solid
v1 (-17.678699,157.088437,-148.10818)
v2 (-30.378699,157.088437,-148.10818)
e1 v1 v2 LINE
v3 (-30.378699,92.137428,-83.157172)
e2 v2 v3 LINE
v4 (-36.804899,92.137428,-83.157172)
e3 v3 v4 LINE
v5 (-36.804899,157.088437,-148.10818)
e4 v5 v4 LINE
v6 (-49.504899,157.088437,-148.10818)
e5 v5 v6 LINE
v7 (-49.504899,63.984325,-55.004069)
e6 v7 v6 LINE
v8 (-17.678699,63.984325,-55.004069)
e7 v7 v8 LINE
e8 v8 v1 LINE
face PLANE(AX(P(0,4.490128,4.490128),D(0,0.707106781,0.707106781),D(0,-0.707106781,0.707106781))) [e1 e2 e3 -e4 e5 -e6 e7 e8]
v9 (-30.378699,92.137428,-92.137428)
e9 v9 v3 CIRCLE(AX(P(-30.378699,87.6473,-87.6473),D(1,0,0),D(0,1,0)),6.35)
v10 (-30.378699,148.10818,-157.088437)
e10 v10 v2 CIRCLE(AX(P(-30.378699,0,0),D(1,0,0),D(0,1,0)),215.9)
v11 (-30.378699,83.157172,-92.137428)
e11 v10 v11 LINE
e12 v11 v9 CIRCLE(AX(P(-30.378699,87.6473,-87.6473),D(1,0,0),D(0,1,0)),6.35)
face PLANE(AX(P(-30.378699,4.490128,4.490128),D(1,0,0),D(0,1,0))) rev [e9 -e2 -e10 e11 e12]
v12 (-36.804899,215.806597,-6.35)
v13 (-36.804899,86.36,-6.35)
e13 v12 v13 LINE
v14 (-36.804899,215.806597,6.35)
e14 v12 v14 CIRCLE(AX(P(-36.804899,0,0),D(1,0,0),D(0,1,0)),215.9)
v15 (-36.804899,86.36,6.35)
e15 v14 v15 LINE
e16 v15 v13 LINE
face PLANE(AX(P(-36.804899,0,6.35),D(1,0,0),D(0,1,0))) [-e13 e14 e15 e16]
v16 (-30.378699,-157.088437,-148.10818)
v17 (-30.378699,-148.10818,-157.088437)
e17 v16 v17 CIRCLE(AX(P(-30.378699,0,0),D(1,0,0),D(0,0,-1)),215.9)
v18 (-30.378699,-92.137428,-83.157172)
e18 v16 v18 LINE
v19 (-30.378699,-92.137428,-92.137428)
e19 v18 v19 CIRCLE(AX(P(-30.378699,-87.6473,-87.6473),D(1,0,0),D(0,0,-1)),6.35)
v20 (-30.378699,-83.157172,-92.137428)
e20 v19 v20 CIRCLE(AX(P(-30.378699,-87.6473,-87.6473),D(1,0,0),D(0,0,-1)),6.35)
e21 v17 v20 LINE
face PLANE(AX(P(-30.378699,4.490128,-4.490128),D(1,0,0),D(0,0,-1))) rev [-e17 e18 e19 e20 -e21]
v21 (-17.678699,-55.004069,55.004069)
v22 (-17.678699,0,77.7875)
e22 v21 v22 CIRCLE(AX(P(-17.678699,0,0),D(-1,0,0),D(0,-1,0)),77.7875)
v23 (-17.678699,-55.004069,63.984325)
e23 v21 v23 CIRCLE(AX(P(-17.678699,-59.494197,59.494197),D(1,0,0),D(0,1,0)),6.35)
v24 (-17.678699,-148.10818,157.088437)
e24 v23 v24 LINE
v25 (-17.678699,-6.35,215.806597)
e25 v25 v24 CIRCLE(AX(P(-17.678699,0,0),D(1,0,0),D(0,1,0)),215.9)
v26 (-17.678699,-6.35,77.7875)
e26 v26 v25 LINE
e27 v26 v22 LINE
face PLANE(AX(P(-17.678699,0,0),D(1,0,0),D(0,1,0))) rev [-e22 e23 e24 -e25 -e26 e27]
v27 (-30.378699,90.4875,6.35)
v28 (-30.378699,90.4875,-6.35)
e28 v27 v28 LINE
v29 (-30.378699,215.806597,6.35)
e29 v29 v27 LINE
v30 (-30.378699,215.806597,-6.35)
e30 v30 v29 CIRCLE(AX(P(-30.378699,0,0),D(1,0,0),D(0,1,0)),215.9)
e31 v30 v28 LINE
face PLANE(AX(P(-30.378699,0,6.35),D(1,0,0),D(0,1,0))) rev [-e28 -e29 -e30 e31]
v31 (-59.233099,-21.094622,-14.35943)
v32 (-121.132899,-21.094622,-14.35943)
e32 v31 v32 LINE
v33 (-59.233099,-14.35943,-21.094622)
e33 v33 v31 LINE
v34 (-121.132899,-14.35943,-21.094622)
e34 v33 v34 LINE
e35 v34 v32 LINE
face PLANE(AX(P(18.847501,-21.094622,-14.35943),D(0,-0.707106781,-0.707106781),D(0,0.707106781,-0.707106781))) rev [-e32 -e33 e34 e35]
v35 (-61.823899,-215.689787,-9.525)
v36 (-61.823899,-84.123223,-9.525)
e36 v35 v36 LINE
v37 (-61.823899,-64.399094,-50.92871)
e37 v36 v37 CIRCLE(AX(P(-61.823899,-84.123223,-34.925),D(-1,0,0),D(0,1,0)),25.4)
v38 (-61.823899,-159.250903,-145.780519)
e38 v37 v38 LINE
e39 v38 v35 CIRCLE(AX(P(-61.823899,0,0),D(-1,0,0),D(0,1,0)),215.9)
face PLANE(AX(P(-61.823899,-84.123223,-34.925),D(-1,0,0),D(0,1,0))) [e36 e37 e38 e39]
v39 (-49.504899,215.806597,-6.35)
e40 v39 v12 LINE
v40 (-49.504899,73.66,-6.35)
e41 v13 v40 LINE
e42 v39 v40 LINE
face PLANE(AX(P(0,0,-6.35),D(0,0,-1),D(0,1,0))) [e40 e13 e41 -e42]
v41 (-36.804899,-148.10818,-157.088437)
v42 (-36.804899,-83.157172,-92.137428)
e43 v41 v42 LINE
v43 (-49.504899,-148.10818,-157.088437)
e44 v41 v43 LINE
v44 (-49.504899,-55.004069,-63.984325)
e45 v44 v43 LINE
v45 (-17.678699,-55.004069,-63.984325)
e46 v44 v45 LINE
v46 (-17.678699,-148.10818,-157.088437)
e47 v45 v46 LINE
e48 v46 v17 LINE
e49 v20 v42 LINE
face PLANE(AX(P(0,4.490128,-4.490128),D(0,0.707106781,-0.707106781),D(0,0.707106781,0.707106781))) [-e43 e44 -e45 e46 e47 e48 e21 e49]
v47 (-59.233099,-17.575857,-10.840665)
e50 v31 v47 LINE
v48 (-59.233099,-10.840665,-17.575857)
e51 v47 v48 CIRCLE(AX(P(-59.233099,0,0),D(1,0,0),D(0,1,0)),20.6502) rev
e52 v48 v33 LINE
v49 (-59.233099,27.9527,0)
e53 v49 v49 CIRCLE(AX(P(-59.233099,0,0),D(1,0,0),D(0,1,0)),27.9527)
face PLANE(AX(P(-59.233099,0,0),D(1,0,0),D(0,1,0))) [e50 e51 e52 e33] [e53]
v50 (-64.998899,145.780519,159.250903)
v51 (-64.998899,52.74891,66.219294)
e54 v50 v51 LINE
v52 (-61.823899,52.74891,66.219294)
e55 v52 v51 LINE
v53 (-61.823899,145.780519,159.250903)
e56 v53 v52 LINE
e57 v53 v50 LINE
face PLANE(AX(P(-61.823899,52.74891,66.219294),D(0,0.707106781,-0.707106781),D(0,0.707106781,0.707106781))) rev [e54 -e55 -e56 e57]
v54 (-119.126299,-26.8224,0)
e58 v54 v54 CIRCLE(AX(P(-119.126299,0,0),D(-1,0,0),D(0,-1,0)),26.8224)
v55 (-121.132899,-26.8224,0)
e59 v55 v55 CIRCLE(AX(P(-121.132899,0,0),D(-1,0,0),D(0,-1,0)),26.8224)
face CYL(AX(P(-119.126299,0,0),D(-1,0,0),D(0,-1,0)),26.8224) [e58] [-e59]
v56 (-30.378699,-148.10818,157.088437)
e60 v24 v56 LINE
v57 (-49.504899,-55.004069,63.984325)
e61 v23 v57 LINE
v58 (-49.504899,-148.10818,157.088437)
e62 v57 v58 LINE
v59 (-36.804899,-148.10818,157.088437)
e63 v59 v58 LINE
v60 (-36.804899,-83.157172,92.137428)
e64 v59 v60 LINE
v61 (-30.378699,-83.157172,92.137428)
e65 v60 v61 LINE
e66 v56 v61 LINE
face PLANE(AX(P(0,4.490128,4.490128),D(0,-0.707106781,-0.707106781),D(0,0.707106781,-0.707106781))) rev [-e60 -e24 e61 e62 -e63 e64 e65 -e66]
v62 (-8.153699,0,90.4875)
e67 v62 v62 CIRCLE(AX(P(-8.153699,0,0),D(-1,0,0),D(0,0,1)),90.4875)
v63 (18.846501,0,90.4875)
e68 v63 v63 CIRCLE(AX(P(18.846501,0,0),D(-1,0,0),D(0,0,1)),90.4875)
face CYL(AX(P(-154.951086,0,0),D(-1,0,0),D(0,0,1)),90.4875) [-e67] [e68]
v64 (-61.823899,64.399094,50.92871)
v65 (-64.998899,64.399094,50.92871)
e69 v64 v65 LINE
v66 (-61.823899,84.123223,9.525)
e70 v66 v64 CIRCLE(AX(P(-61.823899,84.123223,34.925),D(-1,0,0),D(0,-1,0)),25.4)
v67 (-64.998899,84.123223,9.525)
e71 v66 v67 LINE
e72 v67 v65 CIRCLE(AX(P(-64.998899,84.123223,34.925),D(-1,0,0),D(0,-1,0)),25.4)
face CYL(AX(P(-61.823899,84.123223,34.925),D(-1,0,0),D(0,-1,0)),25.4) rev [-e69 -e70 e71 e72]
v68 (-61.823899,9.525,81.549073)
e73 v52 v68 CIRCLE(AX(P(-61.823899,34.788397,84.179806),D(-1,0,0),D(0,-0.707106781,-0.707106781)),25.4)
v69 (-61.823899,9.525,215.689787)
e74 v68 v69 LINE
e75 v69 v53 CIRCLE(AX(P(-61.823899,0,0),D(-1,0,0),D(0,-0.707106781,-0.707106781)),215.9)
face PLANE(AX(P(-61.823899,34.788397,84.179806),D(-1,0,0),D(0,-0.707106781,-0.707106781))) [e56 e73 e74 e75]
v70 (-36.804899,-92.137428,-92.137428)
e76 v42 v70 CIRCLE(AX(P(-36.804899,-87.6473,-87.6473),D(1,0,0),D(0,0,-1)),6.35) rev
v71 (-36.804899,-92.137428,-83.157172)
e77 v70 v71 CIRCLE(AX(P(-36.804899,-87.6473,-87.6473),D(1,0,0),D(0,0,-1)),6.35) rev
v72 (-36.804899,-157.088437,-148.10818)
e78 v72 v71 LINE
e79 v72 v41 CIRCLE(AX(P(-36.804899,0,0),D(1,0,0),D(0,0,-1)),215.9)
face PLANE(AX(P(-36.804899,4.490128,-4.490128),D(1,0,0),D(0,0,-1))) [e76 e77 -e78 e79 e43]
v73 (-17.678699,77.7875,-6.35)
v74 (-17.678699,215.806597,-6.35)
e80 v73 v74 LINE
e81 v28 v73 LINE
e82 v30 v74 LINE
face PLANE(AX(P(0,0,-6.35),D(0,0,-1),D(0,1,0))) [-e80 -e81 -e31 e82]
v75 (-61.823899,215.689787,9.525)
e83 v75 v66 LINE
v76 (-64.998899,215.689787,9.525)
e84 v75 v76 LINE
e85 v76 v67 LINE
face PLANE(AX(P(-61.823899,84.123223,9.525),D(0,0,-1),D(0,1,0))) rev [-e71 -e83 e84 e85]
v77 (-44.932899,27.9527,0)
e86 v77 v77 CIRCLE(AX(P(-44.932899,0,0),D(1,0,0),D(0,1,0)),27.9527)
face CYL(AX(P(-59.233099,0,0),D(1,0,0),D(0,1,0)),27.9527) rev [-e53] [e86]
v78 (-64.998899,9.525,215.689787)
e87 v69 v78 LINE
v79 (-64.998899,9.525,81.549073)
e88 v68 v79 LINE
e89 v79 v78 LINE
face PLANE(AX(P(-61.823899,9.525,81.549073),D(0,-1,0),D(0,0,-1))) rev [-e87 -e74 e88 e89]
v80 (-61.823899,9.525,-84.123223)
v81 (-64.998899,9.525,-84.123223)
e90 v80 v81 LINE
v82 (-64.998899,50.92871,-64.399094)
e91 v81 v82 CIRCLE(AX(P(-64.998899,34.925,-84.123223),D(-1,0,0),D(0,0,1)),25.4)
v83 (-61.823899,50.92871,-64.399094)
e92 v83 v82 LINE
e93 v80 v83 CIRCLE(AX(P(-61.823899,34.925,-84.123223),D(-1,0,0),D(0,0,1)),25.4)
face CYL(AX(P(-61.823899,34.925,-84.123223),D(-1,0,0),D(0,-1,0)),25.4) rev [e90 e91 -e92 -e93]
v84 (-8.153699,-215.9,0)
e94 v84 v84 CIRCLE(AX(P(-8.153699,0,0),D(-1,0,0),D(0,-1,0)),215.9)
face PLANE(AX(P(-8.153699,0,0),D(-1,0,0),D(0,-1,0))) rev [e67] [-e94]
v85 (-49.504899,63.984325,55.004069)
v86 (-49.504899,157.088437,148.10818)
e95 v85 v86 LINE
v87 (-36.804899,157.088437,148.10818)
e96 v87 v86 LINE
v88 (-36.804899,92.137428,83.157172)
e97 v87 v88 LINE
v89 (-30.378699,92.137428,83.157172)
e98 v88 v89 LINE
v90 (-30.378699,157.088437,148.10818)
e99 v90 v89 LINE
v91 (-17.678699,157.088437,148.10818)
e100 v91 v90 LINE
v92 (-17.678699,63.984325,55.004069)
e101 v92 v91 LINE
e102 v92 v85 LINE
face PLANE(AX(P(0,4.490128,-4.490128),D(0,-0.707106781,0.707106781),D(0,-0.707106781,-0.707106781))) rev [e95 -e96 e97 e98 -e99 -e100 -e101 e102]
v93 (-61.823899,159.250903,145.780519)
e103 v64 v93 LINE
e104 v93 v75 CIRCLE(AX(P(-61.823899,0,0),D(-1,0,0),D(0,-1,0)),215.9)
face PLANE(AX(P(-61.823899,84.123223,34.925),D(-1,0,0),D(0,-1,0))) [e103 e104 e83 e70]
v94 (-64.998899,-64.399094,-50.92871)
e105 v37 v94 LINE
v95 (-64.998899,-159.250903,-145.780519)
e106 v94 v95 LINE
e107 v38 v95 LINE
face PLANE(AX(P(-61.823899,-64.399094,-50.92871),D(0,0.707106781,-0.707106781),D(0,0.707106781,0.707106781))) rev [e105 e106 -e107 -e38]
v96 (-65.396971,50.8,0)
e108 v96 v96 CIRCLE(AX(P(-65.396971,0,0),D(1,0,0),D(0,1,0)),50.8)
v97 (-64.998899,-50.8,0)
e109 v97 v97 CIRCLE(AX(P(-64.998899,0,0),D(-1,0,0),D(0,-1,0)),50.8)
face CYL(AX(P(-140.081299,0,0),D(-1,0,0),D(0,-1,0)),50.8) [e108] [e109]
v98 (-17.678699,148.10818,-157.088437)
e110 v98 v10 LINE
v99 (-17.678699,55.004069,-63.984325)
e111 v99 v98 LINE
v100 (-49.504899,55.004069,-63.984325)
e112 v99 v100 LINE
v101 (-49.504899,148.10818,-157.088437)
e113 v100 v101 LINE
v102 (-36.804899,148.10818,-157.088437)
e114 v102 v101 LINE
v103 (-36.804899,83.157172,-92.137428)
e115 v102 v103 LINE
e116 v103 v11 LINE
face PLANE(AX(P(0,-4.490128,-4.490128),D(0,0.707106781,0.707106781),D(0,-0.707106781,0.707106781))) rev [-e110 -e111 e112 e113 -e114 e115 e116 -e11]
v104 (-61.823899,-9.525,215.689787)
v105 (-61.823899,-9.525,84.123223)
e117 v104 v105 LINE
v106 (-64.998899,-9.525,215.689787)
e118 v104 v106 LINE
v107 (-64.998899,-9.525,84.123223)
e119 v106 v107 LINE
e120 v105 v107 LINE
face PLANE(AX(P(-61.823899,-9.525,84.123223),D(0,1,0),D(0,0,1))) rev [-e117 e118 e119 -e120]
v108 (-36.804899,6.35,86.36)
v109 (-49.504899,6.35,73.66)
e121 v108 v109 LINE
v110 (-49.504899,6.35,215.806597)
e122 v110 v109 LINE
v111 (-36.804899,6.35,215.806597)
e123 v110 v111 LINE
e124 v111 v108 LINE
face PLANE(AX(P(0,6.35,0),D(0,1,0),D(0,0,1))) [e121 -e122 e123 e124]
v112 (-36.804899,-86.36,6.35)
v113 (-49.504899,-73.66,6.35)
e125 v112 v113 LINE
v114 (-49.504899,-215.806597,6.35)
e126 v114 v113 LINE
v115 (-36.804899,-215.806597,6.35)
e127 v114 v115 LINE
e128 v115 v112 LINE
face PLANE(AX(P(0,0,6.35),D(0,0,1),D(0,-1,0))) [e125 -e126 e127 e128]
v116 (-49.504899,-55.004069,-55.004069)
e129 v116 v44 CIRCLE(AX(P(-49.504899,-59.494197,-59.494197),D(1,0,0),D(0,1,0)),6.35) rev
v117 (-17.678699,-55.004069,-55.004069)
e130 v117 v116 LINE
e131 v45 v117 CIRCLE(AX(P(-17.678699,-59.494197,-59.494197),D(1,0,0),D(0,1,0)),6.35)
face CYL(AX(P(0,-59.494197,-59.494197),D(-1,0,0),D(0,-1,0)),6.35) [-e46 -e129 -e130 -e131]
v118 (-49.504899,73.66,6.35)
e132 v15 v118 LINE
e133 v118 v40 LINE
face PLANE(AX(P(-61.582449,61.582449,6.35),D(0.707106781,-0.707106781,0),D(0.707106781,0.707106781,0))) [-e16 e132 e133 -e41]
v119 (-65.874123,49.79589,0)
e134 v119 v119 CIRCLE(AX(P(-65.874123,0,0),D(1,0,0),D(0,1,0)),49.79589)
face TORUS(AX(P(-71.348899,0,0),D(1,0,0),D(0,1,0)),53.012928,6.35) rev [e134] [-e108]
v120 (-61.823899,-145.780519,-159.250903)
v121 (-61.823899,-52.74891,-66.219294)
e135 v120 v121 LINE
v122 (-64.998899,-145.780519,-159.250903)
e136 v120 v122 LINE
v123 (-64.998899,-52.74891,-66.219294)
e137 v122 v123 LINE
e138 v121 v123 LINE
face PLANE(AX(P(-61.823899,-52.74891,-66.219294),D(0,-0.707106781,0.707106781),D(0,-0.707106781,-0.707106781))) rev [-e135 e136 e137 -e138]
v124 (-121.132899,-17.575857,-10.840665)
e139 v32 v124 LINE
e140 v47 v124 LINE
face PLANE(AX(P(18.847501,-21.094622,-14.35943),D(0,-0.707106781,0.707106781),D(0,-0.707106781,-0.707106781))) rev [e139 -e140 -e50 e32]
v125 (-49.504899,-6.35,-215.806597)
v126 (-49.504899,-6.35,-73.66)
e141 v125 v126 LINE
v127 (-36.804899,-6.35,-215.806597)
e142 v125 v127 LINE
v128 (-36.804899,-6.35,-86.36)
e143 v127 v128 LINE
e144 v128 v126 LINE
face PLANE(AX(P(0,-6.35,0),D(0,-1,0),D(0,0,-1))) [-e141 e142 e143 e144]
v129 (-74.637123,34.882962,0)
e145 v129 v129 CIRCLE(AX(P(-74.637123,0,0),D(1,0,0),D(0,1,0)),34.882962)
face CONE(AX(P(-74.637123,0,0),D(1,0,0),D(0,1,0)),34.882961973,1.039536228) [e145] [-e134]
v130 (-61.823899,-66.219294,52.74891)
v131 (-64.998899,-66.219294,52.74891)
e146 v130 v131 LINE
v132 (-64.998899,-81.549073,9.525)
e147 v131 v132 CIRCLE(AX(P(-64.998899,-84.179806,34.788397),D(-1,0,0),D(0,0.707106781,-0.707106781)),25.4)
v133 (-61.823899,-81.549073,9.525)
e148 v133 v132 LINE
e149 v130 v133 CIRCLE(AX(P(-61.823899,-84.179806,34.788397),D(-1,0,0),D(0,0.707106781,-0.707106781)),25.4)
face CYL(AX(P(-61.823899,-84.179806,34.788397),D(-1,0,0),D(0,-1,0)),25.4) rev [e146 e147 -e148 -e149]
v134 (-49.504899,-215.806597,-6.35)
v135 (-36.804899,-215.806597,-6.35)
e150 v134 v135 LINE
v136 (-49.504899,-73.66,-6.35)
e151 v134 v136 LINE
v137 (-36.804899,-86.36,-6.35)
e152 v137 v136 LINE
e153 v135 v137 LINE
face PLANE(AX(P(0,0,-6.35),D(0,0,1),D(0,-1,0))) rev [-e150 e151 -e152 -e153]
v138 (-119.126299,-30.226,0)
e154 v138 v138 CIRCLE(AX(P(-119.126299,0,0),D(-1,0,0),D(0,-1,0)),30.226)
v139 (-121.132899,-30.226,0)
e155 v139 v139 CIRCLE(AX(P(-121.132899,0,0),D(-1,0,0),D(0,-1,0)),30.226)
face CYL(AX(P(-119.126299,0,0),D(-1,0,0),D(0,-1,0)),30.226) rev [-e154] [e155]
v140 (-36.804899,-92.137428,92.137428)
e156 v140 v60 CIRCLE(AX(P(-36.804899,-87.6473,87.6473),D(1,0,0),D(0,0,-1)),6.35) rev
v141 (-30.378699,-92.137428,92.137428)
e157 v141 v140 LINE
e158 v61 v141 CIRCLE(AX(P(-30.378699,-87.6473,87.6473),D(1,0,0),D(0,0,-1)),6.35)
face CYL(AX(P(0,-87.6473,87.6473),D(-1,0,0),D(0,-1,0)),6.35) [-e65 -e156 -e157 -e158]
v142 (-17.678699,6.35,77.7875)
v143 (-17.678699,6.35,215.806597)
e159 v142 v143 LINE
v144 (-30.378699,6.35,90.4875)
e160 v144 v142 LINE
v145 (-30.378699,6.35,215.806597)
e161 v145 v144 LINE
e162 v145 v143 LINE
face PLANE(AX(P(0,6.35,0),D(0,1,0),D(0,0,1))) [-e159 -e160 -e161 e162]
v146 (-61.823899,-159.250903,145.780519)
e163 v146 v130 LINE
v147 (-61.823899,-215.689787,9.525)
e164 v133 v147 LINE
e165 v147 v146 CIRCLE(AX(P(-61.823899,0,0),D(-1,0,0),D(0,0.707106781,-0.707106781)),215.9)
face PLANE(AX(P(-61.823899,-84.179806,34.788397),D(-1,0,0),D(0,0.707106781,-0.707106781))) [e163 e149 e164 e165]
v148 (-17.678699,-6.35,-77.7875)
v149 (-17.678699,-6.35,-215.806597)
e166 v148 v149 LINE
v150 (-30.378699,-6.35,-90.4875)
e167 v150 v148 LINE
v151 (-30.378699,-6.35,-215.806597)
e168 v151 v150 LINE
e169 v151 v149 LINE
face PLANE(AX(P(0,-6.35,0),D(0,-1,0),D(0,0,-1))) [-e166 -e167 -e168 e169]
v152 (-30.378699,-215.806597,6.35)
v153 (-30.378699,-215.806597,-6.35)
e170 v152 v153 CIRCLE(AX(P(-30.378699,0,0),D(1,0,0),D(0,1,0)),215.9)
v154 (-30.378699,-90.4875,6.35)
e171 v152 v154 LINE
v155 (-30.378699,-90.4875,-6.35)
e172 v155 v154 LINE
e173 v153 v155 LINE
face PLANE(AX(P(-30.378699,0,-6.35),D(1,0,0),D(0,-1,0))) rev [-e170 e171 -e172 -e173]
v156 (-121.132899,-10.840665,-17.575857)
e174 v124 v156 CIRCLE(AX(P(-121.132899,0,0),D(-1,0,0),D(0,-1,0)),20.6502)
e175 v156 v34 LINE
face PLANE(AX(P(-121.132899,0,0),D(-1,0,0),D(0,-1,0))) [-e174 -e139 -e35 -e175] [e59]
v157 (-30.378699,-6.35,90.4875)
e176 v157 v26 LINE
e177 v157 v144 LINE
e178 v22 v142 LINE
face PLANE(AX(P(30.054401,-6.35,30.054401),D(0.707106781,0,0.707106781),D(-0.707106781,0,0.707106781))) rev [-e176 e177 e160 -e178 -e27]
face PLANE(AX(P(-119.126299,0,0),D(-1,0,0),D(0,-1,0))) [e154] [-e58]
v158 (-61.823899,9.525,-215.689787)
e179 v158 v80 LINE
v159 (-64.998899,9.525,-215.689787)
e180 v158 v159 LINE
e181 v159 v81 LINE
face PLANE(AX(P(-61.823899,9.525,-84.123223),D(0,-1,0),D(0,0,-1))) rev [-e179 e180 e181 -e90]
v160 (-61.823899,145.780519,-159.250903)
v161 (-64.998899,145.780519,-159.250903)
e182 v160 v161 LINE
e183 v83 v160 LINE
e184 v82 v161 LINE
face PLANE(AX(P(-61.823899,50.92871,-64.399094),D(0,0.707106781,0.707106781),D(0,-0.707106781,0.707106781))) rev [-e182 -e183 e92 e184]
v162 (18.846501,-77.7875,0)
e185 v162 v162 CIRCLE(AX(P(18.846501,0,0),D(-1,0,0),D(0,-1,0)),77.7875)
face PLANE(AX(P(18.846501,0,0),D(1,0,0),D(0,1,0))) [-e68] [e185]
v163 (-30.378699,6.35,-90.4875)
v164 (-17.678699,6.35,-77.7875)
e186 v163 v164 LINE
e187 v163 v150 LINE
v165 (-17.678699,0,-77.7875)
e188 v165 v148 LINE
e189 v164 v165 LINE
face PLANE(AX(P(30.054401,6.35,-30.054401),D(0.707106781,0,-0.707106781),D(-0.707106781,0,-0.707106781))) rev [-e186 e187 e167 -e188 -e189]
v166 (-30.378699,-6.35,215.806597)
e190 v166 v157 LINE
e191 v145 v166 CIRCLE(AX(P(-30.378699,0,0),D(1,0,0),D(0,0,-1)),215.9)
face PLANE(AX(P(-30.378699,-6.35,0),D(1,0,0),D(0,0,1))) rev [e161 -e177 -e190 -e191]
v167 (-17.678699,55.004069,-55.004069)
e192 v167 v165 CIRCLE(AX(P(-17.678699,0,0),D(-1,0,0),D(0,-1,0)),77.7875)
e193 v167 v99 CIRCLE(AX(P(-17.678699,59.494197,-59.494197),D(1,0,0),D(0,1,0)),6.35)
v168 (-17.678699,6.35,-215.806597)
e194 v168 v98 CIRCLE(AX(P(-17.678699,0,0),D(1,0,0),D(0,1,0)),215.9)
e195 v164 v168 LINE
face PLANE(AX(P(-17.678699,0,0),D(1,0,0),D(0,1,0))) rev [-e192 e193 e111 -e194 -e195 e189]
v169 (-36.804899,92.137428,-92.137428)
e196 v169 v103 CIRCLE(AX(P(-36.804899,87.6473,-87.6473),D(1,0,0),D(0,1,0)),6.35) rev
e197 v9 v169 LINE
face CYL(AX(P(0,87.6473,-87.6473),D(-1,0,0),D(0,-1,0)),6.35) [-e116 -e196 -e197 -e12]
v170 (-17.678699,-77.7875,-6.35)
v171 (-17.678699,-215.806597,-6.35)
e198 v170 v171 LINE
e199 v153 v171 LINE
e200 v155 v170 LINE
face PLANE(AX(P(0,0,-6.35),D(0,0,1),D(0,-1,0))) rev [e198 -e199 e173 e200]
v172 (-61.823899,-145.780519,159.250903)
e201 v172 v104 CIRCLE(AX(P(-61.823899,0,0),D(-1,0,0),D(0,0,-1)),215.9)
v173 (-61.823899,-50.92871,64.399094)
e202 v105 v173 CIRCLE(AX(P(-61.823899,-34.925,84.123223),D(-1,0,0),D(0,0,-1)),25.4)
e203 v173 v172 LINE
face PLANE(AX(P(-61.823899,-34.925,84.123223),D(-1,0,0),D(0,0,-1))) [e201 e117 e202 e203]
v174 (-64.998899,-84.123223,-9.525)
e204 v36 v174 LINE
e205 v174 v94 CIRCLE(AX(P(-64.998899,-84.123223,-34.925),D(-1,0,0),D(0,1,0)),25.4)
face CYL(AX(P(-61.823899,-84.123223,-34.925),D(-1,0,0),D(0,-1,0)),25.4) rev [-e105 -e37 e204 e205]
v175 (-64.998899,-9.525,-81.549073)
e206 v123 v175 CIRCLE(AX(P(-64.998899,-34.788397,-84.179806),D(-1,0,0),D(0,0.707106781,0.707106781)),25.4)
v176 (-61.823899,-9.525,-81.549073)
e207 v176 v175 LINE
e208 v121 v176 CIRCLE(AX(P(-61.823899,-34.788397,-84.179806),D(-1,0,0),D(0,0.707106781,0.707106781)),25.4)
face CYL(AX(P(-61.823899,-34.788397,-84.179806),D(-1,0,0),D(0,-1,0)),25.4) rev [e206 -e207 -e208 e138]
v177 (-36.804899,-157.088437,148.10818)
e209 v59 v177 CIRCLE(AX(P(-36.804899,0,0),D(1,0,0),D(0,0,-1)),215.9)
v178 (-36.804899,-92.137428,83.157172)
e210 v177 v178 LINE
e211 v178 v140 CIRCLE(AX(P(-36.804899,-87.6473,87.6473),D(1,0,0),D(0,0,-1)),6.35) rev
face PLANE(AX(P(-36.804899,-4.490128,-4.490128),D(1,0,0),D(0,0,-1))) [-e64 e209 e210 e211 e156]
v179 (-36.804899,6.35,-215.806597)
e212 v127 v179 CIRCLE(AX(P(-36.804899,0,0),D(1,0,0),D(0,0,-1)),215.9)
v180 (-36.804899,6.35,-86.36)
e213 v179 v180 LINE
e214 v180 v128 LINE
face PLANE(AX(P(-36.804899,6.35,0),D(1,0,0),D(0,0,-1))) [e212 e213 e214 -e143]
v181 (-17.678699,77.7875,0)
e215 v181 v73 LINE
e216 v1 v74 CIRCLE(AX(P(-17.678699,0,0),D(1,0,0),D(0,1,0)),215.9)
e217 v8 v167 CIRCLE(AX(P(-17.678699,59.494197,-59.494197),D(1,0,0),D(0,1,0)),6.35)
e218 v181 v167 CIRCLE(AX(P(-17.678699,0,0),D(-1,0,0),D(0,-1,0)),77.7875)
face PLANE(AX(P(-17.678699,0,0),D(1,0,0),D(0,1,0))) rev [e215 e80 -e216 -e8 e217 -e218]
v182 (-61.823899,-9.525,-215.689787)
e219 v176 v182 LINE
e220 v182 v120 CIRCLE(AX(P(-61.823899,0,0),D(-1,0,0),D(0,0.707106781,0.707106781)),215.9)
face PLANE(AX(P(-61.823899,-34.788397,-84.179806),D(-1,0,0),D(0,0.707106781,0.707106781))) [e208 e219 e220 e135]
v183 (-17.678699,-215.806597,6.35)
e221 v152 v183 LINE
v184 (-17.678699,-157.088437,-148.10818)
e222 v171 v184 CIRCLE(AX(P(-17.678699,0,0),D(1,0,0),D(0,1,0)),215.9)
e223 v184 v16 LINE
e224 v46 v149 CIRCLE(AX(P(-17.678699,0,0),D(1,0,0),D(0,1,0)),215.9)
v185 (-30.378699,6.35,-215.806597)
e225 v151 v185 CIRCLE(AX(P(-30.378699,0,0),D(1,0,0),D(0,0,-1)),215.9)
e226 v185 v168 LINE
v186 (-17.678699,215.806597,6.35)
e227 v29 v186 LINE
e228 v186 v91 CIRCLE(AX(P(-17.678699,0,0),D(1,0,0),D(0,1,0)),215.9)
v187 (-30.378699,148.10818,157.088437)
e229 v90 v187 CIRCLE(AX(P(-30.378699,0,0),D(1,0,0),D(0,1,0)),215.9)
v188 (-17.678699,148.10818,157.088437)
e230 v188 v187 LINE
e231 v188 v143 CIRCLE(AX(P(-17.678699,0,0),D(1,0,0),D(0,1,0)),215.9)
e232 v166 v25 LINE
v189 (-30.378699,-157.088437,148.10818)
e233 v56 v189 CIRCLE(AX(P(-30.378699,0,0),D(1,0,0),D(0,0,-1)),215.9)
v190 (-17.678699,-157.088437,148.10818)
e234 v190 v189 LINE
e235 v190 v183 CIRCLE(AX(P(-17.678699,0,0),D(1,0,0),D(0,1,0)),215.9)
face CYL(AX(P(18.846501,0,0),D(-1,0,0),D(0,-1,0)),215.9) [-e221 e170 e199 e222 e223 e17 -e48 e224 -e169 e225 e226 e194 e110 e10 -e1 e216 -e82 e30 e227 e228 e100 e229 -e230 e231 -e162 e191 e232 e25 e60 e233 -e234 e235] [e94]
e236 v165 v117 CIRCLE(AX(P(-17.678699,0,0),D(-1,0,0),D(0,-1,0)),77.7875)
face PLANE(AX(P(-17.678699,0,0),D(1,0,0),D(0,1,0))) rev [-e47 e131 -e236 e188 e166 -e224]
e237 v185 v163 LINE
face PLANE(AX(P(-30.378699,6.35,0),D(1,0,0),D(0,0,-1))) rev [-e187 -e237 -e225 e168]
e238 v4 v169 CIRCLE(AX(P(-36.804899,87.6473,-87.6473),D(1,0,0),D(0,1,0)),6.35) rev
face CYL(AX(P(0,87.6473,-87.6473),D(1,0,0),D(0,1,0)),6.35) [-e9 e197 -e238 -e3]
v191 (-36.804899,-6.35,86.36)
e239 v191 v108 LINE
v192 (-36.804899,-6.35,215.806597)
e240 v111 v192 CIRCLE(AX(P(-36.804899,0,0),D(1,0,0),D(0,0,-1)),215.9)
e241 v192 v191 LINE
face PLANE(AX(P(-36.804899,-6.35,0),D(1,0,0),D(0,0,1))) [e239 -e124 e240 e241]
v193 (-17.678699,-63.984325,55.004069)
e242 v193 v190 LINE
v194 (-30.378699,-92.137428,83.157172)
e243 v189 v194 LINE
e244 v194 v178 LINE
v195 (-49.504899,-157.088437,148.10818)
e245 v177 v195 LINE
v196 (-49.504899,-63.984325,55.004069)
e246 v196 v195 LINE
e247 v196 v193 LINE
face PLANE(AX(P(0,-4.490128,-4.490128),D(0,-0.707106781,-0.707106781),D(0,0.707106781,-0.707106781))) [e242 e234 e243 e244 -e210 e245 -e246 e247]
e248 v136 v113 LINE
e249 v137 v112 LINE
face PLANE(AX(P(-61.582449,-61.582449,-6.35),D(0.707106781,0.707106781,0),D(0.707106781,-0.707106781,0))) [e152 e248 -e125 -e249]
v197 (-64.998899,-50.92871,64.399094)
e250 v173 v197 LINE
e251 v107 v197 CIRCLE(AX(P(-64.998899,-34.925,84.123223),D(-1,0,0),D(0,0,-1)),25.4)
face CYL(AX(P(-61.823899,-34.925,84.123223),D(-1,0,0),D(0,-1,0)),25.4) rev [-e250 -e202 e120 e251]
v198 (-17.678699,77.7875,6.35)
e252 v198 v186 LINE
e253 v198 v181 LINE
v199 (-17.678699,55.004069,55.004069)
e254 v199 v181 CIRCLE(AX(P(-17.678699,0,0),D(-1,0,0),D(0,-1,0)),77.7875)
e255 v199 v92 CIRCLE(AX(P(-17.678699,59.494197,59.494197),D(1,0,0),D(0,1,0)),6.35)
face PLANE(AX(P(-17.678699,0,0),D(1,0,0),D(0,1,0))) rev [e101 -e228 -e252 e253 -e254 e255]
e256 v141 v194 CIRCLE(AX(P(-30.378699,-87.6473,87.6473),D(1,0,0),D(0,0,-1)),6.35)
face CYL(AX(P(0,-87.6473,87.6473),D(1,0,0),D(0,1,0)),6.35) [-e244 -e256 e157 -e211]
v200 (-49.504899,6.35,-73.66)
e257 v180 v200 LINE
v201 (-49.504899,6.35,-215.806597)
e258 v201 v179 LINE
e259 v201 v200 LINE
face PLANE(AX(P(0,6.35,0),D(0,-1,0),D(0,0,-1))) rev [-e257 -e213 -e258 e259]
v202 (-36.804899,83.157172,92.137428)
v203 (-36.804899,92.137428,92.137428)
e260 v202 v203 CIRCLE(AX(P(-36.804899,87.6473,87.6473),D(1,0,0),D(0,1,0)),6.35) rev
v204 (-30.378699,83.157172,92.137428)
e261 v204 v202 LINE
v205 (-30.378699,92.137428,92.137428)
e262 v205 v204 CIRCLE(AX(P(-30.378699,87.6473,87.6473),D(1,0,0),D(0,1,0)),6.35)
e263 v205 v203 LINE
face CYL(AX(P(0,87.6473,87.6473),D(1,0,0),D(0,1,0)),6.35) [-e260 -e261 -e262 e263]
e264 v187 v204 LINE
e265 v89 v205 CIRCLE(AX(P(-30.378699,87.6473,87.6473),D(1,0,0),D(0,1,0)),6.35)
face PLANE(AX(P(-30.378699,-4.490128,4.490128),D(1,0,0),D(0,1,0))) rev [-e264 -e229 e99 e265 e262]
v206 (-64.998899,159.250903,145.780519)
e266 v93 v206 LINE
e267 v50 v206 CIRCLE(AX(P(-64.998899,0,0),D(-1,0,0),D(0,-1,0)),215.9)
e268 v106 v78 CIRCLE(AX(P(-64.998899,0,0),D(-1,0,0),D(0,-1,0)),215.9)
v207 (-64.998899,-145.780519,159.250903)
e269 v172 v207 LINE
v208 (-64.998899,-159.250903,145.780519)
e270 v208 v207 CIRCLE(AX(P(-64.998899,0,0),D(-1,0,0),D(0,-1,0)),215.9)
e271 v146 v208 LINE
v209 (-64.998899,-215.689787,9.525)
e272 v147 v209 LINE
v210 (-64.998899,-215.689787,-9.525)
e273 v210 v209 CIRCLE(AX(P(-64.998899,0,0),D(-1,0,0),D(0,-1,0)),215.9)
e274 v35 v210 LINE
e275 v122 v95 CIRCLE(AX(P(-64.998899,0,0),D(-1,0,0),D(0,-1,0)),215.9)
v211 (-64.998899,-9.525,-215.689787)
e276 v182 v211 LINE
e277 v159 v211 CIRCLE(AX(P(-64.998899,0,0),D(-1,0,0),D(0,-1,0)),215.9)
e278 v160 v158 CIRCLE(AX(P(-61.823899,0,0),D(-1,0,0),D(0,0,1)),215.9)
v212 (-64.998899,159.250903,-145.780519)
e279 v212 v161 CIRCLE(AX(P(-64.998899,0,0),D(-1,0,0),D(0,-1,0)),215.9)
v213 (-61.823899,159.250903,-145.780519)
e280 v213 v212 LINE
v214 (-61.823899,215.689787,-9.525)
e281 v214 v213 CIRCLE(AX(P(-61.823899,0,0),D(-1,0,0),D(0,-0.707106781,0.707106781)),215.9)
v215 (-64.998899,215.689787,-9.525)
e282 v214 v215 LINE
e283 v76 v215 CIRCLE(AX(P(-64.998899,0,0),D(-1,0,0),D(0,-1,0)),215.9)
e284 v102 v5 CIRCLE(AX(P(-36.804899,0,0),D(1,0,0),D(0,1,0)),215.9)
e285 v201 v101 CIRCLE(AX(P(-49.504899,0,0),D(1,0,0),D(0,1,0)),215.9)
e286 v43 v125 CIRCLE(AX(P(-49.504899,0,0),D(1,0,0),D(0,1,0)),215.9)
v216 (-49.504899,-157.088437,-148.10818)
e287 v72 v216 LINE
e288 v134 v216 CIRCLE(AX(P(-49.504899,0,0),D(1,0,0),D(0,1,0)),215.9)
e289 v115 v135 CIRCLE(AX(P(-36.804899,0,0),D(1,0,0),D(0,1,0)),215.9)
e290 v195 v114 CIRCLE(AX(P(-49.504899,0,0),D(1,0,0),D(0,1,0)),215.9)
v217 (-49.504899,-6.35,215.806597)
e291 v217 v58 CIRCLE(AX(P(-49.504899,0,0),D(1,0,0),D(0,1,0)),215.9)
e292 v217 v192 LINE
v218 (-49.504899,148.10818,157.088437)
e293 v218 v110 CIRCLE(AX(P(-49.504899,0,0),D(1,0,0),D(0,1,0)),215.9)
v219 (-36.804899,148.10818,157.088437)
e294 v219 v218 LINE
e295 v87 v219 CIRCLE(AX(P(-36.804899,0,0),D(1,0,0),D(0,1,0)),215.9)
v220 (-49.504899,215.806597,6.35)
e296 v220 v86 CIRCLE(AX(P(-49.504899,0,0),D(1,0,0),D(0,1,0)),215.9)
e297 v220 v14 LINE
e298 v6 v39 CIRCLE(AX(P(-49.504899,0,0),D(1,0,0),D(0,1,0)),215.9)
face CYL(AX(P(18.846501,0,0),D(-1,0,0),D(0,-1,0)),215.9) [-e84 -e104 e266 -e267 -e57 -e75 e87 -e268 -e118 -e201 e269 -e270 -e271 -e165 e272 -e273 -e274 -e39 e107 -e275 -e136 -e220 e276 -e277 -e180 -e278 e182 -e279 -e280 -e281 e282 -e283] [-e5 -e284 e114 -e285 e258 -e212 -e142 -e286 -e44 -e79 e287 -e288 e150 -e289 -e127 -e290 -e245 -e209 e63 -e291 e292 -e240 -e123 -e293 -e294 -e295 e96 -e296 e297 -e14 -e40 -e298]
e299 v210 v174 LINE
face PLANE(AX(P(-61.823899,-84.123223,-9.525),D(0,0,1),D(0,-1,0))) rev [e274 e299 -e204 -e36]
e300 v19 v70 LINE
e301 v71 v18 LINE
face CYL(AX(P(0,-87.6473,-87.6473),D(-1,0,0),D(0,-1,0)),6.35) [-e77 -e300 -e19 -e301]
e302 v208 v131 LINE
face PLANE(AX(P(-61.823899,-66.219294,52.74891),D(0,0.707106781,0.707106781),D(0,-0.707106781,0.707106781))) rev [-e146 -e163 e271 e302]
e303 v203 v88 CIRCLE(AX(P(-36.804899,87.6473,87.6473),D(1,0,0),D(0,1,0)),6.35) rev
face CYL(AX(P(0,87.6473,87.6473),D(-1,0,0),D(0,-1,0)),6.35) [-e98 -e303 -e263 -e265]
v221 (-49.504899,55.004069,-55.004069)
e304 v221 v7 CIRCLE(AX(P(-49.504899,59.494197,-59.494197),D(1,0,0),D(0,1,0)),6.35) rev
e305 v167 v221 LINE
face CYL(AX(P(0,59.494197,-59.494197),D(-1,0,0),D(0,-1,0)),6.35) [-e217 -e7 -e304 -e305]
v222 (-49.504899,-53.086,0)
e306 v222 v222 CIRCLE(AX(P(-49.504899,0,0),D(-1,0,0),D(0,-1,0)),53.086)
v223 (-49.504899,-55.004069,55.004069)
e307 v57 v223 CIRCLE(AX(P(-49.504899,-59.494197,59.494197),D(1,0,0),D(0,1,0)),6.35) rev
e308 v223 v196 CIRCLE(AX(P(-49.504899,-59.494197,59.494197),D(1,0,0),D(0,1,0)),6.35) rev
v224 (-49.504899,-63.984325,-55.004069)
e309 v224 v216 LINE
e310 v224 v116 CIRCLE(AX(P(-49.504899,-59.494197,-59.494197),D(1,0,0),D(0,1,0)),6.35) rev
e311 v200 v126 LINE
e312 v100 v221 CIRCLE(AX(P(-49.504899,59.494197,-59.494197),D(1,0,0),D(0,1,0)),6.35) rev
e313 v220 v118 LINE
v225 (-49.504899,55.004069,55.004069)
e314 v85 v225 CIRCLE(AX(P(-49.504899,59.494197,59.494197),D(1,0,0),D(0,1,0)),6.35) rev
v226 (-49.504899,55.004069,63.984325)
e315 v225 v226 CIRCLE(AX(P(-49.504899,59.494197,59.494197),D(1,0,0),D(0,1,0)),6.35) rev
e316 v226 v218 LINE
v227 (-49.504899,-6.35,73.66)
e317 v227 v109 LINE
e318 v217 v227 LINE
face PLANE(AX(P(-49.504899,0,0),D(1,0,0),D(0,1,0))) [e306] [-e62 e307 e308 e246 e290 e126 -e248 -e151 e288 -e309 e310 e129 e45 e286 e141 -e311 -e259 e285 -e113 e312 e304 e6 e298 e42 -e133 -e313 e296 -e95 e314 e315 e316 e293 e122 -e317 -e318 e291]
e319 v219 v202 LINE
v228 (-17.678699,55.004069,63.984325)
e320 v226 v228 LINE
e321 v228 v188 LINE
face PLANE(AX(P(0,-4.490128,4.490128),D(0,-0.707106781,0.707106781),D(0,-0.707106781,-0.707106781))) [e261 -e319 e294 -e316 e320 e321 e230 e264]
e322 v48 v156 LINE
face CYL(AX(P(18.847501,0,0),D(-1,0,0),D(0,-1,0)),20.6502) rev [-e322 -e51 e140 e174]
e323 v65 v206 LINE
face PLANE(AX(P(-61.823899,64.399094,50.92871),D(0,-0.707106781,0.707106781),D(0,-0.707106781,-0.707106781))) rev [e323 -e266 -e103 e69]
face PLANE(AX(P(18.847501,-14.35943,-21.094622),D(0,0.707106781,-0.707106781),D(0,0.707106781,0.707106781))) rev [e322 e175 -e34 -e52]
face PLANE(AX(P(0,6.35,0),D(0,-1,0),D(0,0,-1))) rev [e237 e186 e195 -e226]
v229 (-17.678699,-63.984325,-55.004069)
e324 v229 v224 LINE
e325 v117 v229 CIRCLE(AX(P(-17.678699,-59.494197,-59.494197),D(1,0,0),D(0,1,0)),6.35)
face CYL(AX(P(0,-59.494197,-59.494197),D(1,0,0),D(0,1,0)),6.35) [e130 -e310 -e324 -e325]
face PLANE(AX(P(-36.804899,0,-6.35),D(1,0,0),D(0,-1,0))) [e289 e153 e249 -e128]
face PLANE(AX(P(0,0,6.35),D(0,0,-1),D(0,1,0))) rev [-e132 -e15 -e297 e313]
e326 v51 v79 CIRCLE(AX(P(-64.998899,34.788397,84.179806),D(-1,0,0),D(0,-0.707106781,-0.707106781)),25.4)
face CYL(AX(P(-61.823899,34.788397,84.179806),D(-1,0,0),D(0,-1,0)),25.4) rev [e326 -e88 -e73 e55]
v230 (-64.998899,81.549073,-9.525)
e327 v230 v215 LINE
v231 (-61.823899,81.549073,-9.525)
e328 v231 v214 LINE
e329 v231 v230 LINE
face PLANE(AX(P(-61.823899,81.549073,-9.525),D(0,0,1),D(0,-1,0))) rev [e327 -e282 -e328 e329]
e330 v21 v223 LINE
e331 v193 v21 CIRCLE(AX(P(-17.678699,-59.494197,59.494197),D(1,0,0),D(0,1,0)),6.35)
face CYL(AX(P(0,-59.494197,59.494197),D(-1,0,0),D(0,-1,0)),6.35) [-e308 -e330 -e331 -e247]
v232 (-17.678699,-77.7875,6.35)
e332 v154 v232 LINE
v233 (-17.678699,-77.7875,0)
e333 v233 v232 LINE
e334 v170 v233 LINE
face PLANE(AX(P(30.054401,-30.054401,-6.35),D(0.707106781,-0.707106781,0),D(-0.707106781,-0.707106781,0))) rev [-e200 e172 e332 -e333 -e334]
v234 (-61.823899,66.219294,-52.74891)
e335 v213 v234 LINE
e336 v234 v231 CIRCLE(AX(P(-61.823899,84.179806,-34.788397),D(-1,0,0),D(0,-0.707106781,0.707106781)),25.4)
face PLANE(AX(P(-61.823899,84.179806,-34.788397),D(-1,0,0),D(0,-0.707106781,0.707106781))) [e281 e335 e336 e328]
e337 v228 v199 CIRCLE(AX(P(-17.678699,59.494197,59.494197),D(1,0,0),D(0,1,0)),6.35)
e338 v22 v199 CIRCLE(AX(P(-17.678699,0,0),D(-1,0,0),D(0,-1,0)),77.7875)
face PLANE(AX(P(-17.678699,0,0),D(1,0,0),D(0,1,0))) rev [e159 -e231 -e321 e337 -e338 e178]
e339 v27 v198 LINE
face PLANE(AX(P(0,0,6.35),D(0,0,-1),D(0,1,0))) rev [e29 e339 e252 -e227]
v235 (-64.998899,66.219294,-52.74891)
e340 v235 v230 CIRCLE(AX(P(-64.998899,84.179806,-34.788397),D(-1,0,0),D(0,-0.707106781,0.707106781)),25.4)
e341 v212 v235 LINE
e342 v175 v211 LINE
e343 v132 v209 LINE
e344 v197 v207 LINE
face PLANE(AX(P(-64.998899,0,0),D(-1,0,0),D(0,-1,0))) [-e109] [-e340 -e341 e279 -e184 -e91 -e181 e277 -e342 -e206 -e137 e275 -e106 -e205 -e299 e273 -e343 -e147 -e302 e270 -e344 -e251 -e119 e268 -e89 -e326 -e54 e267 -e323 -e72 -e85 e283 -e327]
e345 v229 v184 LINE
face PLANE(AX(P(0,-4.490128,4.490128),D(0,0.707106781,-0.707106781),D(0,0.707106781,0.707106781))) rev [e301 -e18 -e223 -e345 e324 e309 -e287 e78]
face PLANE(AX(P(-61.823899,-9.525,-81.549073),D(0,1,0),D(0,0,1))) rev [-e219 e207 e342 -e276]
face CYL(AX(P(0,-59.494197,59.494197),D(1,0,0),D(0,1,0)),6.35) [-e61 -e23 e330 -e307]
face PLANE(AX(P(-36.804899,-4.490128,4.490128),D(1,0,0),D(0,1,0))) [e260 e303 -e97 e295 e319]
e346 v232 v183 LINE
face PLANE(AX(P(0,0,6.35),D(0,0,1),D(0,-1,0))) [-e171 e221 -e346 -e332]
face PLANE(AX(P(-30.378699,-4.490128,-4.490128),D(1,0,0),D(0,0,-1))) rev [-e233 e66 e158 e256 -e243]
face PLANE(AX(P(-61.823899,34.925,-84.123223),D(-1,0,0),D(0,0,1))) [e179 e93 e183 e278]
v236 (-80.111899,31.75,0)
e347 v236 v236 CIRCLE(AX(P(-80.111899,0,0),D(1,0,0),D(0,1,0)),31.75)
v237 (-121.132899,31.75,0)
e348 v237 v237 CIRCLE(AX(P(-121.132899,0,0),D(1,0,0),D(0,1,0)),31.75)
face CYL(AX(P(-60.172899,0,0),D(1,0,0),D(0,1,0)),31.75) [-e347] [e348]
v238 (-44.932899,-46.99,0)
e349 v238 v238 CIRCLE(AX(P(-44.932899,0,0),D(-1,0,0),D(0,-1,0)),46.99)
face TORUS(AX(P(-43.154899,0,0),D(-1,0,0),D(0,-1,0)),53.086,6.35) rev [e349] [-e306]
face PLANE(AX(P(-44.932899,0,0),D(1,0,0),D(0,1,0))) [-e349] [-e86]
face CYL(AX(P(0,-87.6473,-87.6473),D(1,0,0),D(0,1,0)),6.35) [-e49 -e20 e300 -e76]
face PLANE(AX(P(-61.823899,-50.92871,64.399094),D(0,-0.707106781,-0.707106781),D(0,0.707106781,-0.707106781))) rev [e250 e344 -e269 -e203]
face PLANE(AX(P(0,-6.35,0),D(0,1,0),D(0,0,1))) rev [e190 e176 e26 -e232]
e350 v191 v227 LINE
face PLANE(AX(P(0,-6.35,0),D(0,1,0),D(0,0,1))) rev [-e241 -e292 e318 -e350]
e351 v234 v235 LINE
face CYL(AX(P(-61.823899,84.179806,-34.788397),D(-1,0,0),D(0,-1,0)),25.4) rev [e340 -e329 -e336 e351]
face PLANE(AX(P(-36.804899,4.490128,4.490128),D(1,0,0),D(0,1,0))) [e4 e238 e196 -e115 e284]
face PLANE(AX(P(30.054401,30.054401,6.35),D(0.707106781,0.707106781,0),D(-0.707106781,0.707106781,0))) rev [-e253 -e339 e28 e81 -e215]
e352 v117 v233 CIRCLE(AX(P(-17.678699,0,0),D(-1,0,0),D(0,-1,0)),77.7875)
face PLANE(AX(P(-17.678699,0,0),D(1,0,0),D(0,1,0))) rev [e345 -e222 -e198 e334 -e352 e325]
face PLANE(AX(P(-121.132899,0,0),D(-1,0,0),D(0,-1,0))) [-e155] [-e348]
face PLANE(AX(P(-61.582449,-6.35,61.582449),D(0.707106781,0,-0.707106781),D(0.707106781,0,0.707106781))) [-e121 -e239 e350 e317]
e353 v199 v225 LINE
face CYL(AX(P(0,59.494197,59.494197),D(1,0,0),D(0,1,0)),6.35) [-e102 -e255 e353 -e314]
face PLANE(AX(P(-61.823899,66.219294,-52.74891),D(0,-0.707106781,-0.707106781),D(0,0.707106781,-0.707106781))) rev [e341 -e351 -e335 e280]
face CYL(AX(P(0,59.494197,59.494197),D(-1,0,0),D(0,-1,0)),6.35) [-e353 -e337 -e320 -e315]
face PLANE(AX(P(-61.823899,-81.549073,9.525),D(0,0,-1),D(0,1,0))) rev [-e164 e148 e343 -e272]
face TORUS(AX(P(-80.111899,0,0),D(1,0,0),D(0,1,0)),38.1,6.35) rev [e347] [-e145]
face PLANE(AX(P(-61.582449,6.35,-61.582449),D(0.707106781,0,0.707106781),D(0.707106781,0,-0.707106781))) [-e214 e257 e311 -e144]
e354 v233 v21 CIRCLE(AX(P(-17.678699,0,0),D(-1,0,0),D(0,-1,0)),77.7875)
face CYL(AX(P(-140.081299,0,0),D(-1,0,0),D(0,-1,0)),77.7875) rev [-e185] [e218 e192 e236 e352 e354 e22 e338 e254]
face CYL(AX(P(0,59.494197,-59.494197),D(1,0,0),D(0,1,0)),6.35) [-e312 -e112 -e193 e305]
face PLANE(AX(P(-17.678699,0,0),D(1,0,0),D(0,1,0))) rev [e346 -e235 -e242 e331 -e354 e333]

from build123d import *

# Parameters (mm, degrees)
BOSS_EXTRUDE3_DEPTH      = 6.35
FILLET1_R                = 6.35
CIRPATTERN5_COUNT        = 4
FILLET1_OF_CIRPATTERN5_R = 6.35
BOSS_EXTRUDE4_DEPTH      = 6.35
CIRPATTERN4_COUNT        = 4
SKETCH6_R                = 234.193665804
SKETCH6_R_2              = 215.9
CUT_EXTRUDE1_DEPTH       = 350.00288517
FILLET2_R                = 0.635
SKETCH7_R                = 60.93897947
CUT_EXTRUDE2_DEPTH       = 4.953
SKETCH8_R                = 79.670197019
CUT_EXTRUDE3_DEPTH       = 18.9484
CUT_EXTRUDE4_START       = 20.32
SKETCH11_R               = 219.71
SKETCH11_R_2             = 50.8
CUT_EXTRUDE4_DEPTH       = 20.32
CUT_EXTRUDE10_REACH      = 337.887
SKETCH20_R               = 30.226
SKETCH20_R_2             = 26.8224
CUT_EXTRUDE11_DEPTH      = 2.0066
CUT_EXTRUDE13_DEPTH      = 3.175
CIRPATTERN6_COUNT        = 8
SKETCH24_W               = 27.0002
SKETCH24_H               = 10.092146942
SKETCH25_R               = 27.9527
CUT_EXTRUDE14_DEPTH      = 14.3002


with BuildPart() as part:
    # Sketch1 → Revolve2 (revolve)
    with BuildSketch(Plane.XY, mode=Mode.PRIVATE) as revolve2_sk:
        with BuildLine():
            Line((-140.081298787, 50.8), (-140.081298787, 0))
            Line((-140.081298787, 0), (-39.979898787, 0))
            Line((-39.979898787, 0), (-39.979898787, 46.736))
            Line((-39.979898787, 46.736), (-43.154898787, 46.736))
            ThreePointArc((-43.154898787, 46.736), (-47.645026847, 48.595871939), (-49.504898787, 53.086))
            Line((-49.504898787, 53.086), (-49.504898787, 219.71))
            Line((-49.504898787, 219.71), (-64.998898787, 219.71))
            Line((-64.998898787, 219.71), (-64.998898787, 63.5))
            ThreePointArc((-64.998898787, 63.5), (-68.718642666, 54.519743879), (-77.698898787, 50.8))
            Line((-77.698898787, 50.8), (-140.081298787, 50.8))
        make_face()
        with BuildLine():
            Line((-9.677698787, 219.71), (-17.678698787, 219.71))
            Line((-17.678698787, 219.71), (-17.678698787, 77.7875))
            Line((-17.678698787, 77.7875), (1.650701213, 77.7875))
            Line((1.650701213, 77.7875), (18.846501213, 77.7875))
            Line((18.846501213, 77.7875), (18.846501213, 93.599))
            ThreePointArc((18.846501213, 93.599), (18.400131948, 94.676630735), (17.322501213, 95.123))
            Line((17.322501213, 95.123), (-6.629698787, 95.123))
            ThreePointArc((-6.629698787, 95.123), (-7.707329521, 95.569369265), (-8.153698787, 96.647))
            Line((-8.153698787, 96.647), (-8.153698787, 218.186))
            ThreePointArc((-8.153698787, 218.186), (-8.600068052, 219.263630735), (-9.677698787, 219.71))
        make_face()
    revolve(revolve2_sk.sketch.rotate(Axis((-140.081298787, 0, 0), (1, 0, 0)), 180), axis=Axis((-140.081298787, 0, 0), (1, 0, 0)))

    # Sketch4 → Boss-Extrude3 (add, symmetric)
    with BuildSketch(Plane(origin=(0, 0, 0), x_dir=(1, 0, 0), z_dir=(0, -0.7071067811865488, 0.7071067811865464))):
        Polygon((-17.678698787, 219.71), (-30.378698787, 219.71), (-30.378698787, 130.302), (-36.804898787, 130.302), (-36.804898787, 219.71), (-49.504898787, 219.71), (-49.504898787, 77.7875), (-17.678698787, 77.7875), align=None)
    boss_extrude3 = extrude(amount=BOSS_EXTRUDE3_DEPTH, both=True)

    # Fillet1
    # the kernel refuses this fillet: 6.35 mm, written as the material it takes off along each edge
    with BuildSketch(Plane(origin=(-30.378698787, 87.647299742, 96.627555863), x_dir=(0, -0.7071067811865464, -0.7071067811865486), z_dir=(-1, 0, 0))) as fillet1_piece_1:
        with BuildLine():
            CenterArc((FILLET1_R, -FILLET1_R), FILLET1_R, 90, 90)
            Line((0, -FILLET1_R), (0, 0))
            Line((0, 0), (FILLET1_R, 0))
        make_face()
    extrude(amount=6.4262, mode=Mode.SUBTRACT)
    with BuildSketch(Plane(origin=(-30.378698787, 96.627555863, 87.647299742), x_dir=(0, -0.7071067811865464, -0.7071067811865486), z_dir=(-1, 0, 0))) as fillet1_piece_2:
        with BuildLine():
            CenterArc((FILLET1_R, FILLET1_R), FILLET1_R, 180, 90)
            Line((0, FILLET1_R), (0, 0))
            Line((0, 0), (FILLET1_R, 0))
        make_face()
    extrude(amount=6.4262, mode=Mode.SUBTRACT)
    with BuildSketch(Plane(origin=(-49.504898787, 59.494196802, 50.513940681), x_dir=(0, 0.707106781186547, 0.7071067811865481), z_dir=(1, 0, 0)), Plane(origin=(-49.504898787, 50.513940681, 59.494196802), x_dir=(0, 0.7071067811865492, -0.7071067811865459), z_dir=(1, 0, 0))) as fillet1_piece_3:
        with BuildLine():
            CenterArc((FILLET1_R, FILLET1_R), FILLET1_R, 180, 90)
            Line((0, FILLET1_R), (0, 0))
            Line((0, 0), (FILLET1_R, 0))
        make_face()
    extrude(amount=31.8262, mode=Mode.SUBTRACT)

    # CirPattern5: Boss-Extrude3 ×4 about axis
    cirpattern5_axis = Axis((0, 0, 0), (1, 0, 0))
    for i in range(1, CIRPATTERN5_COUNT):
        add(boss_extrude3.rotate(cirpattern5_axis, i * 360 / CIRPATTERN5_COUNT))

    # Fillet1 of CirPattern5
    # the kernel refuses this fillet: 6.35 mm, written as the material it takes off along each edge
    with BuildSketch(Plane(origin=(-30.378698787, -96.627555863, 87.647299742), x_dir=(0, 0.7071067811865509, -0.7071067811865441), z_dir=(-1, 0, 0)), Plane(origin=(-30.378698787, -87.647299742, -96.627555863), x_dir=(0, 0.7071067811865452, 0.7071067811865498), z_dir=(-1, 0, 0)), Plane(origin=(-30.378698787, 96.627555863, -87.647299742), x_dir=(0, -0.7071067811865498, 0.7071067811865454), z_dir=(-1, 0, 0))) as fillet1_of_cirpattern5_piece_1:
        with BuildLine():
            CenterArc((FILLET1_OF_CIRPATTERN5_R, -FILLET1_OF_CIRPATTERN5_R), FILLET1_OF_CIRPATTERN5_R, 90, 90)
            Line((0, -FILLET1_OF_CIRPATTERN5_R), (0, 0))
            Line((0, 0), (FILLET1_OF_CIRPATTERN5_R, 0))
        make_face()
    extrude(amount=6.4262, mode=Mode.SUBTRACT)
    with BuildSketch(Plane(origin=(-30.378698787, -87.647299742, 96.627555863), x_dir=(0, 0.7071067811865509, -0.7071067811865441), z_dir=(-1, 0, 0)), Plane(origin=(-30.378698787, -96.627555863, -87.647299742), x_dir=(0, 0.7071067811865441, 0.7071067811865509), z_dir=(-1, 0, 0)), Plane(origin=(-30.378698787, 87.647299742, -96.627555863), x_dir=(0, -0.7071067811865509, 0.7071067811865441), z_dir=(-1, 0, 0))) as fillet1_of_cirpattern5_piece_2:
        with BuildLine():
            CenterArc((FILLET1_OF_CIRPATTERN5_R, FILLET1_OF_CIRPATTERN5_R), FILLET1_OF_CIRPATTERN5_R, 180, 90)
            Line((0, FILLET1_OF_CIRPATTERN5_R), (0, 0))
            Line((0, 0), (FILLET1_OF_CIRPATTERN5_R, 0))
        make_face()
    extrude(amount=6.4262, mode=Mode.SUBTRACT)
    with BuildSketch(Plane(origin=(-49.504898787, -50.513940681, 59.494196802), x_dir=(0, -0.7071067811865475, 0.7071067811865475), z_dir=(1, 0, 0)), Plane(origin=(-49.504898787, -59.494196802, 50.513940681), x_dir=(0, 0.7071067811865464, 0.7071067811865486), z_dir=(1, 0, 0)), Plane(origin=(-49.504898787, -59.494196802, -50.513940681), x_dir=(0, -0.7071067811865481, -0.707106781186547), z_dir=(1, 0, 0)), Plane(origin=(-49.504898787, -50.513940681, -59.494196802), x_dir=(0, -0.7071067811865486, 0.7071067811865464), z_dir=(1, 0, 0)), Plane(origin=(-49.504898787, 50.513940681, -59.494196802), x_dir=(0, 0.7071067811865476, -0.7071067811865476), z_dir=(1, 0, 0)), Plane(origin=(-49.504898787, 59.494196802, -50.513940681), x_dir=(0, -0.7071067811865459, -0.7071067811865492), z_dir=(1, 0, 0))) as fillet1_of_cirpattern5_piece_3:
        with BuildLine():
            CenterArc((FILLET1_OF_CIRPATTERN5_R, FILLET1_OF_CIRPATTERN5_R), FILLET1_OF_CIRPATTERN5_R, 180, 90)
            Line((0, FILLET1_OF_CIRPATTERN5_R), (0, 0))
            Line((0, 0), (FILLET1_OF_CIRPATTERN5_R, 0))
        make_face()
    extrude(amount=31.8262, mode=Mode.SUBTRACT)

    # Sketch5 → Boss-Extrude4 (add, symmetric)
    with BuildSketch(Plane(origin=(0, 0, 0), x_dir=(-1, 0, 0), z_dir=(0, 0, -1))):
        Polygon((49.504898787, 219.71), (49.504898787, 73.66), (36.804898787, 86.36), (36.804898787, 219.71), align=None)
        Polygon((17.678698787, 77.7875), (17.678698787, 219.71), (30.378698787, 219.71), (30.378698787, 90.4875), align=None)
    boss_extrude4 = extrude(amount=BOSS_EXTRUDE4_DEPTH, both=True)

    # CirPattern4: Boss-Extrude4 ×4 about axis
    cirpattern4_axis = Axis((0, 0, 0), (1, 0, 0))
    for i in range(1, CIRPATTERN4_COUNT):
        add(boss_extrude4.rotate(cirpattern4_axis, i * 360 / CIRPATTERN4_COUNT))

    # Sketch6 → Cut-Extrude1 (cut, through all)
    with BuildSketch(Plane.ZY.offset(140.081298787)):
        Circle(SKETCH6_R)
        with Locations(Location((0, 0, 0), (0, 0, 270))):
            Circle(SKETCH6_R_2, mode=Mode.SUBTRACT)
    extrude(amount=-CUT_EXTRUDE1_DEPTH, mode=Mode.SUBTRACT)

    # Fillet2
    fillet2_edges = [part.edges().sort_by_distance(p)[0] for p in [
        (-39.979898787, 46.736, 0),
    ]]
    fillet(fillet2_edges, radius=FILLET2_R)

    # Sketch7 → Cut-Extrude2 (cut)
    with BuildSketch(Plane(origin=(-39.979898787, 0, 0), x_dir=(0, 0, -1), z_dir=(1, 0, 0))):
        Circle(SKETCH7_R)
    extrude(amount=-CUT_EXTRUDE2_DEPTH, mode=Mode.SUBTRACT)

    # Sketch8 → Cut-Extrude3 (cut)
    with BuildSketch(Plane.ZY.offset(140.081298787)):
        Circle(SKETCH8_R)
    extrude(amount=-CUT_EXTRUDE3_DEPTH, mode=Mode.SUBTRACT)

    # Sketch11 → Cut-Extrude4 (cut)
    with BuildSketch(Plane.ZY.offset(64.998898787).offset(CUT_EXTRUDE4_START)):
        Circle(SKETCH11_R)
        with Locations(Location((0, 0, 0), (0, 0, 270))):
            Circle(SKETCH11_R_2, mode=Mode.SUBTRACT)
    extrude(amount=-CUT_EXTRUDE4_DEPTH, mode=Mode.SUBTRACT)

    # Sketch12 → Cut-Revolve1 (revolve, cut)
    with BuildSketch(Plane(origin=(0, 0, 0), x_dir=(1, 0, 0), z_dir=(0, 1, 0)), mode=Mode.PRIVATE) as cut_revolve1_sk:
        with BuildLine():
            Line((-121.132898787, 31.75), (-80.111898787, 31.75))
            ThreePointArc((-80.111898787, 31.75), (-76.957987839, 32.588616713), (-74.637123327, 34.882961973))
            Line((-74.637123327, 34.882961973), (-65.874123327, 49.795890249))
            ThreePointArc((-65.874123327, 49.795890249), (-65.613530636, 50.287482958), (-65.396970658, 50.8))
            Line((-65.396970658, 50.8), (-121.132898787, 50.8))
            Line((-121.132898787, 50.8), (-121.132898787, 31.75))
        make_face()
    revolve(cut_revolve1_sk.sketch.rotate(Axis((-60.172898787, 0, 0), (-1, 0, 0)), 270), axis=Axis((-60.172898787, 0, 0), (-1, 0, 0)), mode=Mode.SUBTRACT)

    # Sketch18 → Cut-Extrude10 (cut, up to next)
    with BuildSketch(Plane.ZY.offset(121.132898787), mode=Mode.PRIVATE) as cut_extrude10_sk1:
        with BuildLine():
            Line((-14.359429538, -21.094621628), (-21.094621628, -14.359429538))
            Line((-21.094621628, -14.359429538), (-17.575856913, -10.840664823))
            ThreePointArc((-17.575856913, -10.840664823), (14.601896453, 14.601896453), (-10.840664823, -17.575856913))
            Line((-10.840664823, -17.575856913), (-14.359429538, -21.094621628))
        make_face()
    cut_extrude10_tool1 = extrude(cut_extrude10_sk1.sketch, amount=-CUT_EXTRUDE10_REACH, mode=Mode.PRIVATE) & part.part
    add(cut_extrude10_tool1.solids().sort_by_distance((-121.132899, -0.51024, -0.51024))[0], mode=Mode.SUBTRACT)

    # Sketch20 → Cut-Extrude11 (cut)
    with BuildSketch(Plane.ZY.offset(121.132898787)):
        with Locations(Location((0, 0, 0), (0, 0, 270))):
            Circle(SKETCH20_R)
        with Locations(Location((0, 0, 0), (0, 0, 270))):
            Circle(SKETCH20_R_2, mode=Mode.SUBTRACT)
    extrude(amount=-CUT_EXTRUDE11_DEPTH, mode=Mode.SUBTRACT)

    # Sketch22 → Cut-Extrude13 (cut)
    with BuildSketch(Plane.ZY.offset(64.998898787)):
        with BuildLine():
            Line((50.92871008, 64.399094261), (145.78051919, 159.250903372))
            ThreePointArc((145.78051919, 159.250903372), (82.621353048, 199.465591069), (9.525, 215.689787368))
            Line((9.525, 215.689787368), (9.525, 84.123223233))
            ThreePointArc((9.525, 84.123223233), (24.00104092, 61.192302667), (50.92871008, 64.399094261))
        make_face()
    cut_extrude13 = extrude(amount=-CUT_EXTRUDE13_DEPTH, mode=Mode.SUBTRACT)

    # CirPattern6: Cut-Extrude13 ×8 about axis
    cirpattern6_axis = Axis((0, 0, 0), (1, 0, 0))
    for i in range(1, CIRPATTERN6_COUNT):
        add(cut_extrude13.rotate(cirpattern6_axis, i * 360 / CIRPATTERN6_COUNT), mode=Mode.SUBTRACT)

    # Sketch24 → Cut-Revolve2 (revolve, cut)
    with BuildSketch(Plane(origin=(0, 0, 0), x_dir=(1, 0, 0), z_dir=(0, 1, 0)), mode=Mode.PRIVATE) as cut_revolve2_sk:
        with Locations((5.346401213, 95.533573471)):
            Rectangle(SKETCH24_W, SKETCH24_H)
    revolve(cut_revolve2_sk.sketch.rotate(Axis((-154.951085714, 0, 0), (1, 0, 0)), 271.68541304), axis=Axis((-154.951085714, 0, 0), (1, 0, 0)), mode=Mode.SUBTRACT)

    # Sketch25 → Cut-Extrude14 (cut)
    with BuildSketch(Plane(origin=(-44.932898787, 0, 0), x_dir=(0, 0, -1), z_dir=(1, 0, 0))):
        with Locations(Location((0, 0, 0), (0, 0, 90))):
            Circle(SKETCH25_R)
    extrude(amount=-CUT_EXTRUDE14_DEPTH, mode=Mode.SUBTRACT)


solid = part.part
